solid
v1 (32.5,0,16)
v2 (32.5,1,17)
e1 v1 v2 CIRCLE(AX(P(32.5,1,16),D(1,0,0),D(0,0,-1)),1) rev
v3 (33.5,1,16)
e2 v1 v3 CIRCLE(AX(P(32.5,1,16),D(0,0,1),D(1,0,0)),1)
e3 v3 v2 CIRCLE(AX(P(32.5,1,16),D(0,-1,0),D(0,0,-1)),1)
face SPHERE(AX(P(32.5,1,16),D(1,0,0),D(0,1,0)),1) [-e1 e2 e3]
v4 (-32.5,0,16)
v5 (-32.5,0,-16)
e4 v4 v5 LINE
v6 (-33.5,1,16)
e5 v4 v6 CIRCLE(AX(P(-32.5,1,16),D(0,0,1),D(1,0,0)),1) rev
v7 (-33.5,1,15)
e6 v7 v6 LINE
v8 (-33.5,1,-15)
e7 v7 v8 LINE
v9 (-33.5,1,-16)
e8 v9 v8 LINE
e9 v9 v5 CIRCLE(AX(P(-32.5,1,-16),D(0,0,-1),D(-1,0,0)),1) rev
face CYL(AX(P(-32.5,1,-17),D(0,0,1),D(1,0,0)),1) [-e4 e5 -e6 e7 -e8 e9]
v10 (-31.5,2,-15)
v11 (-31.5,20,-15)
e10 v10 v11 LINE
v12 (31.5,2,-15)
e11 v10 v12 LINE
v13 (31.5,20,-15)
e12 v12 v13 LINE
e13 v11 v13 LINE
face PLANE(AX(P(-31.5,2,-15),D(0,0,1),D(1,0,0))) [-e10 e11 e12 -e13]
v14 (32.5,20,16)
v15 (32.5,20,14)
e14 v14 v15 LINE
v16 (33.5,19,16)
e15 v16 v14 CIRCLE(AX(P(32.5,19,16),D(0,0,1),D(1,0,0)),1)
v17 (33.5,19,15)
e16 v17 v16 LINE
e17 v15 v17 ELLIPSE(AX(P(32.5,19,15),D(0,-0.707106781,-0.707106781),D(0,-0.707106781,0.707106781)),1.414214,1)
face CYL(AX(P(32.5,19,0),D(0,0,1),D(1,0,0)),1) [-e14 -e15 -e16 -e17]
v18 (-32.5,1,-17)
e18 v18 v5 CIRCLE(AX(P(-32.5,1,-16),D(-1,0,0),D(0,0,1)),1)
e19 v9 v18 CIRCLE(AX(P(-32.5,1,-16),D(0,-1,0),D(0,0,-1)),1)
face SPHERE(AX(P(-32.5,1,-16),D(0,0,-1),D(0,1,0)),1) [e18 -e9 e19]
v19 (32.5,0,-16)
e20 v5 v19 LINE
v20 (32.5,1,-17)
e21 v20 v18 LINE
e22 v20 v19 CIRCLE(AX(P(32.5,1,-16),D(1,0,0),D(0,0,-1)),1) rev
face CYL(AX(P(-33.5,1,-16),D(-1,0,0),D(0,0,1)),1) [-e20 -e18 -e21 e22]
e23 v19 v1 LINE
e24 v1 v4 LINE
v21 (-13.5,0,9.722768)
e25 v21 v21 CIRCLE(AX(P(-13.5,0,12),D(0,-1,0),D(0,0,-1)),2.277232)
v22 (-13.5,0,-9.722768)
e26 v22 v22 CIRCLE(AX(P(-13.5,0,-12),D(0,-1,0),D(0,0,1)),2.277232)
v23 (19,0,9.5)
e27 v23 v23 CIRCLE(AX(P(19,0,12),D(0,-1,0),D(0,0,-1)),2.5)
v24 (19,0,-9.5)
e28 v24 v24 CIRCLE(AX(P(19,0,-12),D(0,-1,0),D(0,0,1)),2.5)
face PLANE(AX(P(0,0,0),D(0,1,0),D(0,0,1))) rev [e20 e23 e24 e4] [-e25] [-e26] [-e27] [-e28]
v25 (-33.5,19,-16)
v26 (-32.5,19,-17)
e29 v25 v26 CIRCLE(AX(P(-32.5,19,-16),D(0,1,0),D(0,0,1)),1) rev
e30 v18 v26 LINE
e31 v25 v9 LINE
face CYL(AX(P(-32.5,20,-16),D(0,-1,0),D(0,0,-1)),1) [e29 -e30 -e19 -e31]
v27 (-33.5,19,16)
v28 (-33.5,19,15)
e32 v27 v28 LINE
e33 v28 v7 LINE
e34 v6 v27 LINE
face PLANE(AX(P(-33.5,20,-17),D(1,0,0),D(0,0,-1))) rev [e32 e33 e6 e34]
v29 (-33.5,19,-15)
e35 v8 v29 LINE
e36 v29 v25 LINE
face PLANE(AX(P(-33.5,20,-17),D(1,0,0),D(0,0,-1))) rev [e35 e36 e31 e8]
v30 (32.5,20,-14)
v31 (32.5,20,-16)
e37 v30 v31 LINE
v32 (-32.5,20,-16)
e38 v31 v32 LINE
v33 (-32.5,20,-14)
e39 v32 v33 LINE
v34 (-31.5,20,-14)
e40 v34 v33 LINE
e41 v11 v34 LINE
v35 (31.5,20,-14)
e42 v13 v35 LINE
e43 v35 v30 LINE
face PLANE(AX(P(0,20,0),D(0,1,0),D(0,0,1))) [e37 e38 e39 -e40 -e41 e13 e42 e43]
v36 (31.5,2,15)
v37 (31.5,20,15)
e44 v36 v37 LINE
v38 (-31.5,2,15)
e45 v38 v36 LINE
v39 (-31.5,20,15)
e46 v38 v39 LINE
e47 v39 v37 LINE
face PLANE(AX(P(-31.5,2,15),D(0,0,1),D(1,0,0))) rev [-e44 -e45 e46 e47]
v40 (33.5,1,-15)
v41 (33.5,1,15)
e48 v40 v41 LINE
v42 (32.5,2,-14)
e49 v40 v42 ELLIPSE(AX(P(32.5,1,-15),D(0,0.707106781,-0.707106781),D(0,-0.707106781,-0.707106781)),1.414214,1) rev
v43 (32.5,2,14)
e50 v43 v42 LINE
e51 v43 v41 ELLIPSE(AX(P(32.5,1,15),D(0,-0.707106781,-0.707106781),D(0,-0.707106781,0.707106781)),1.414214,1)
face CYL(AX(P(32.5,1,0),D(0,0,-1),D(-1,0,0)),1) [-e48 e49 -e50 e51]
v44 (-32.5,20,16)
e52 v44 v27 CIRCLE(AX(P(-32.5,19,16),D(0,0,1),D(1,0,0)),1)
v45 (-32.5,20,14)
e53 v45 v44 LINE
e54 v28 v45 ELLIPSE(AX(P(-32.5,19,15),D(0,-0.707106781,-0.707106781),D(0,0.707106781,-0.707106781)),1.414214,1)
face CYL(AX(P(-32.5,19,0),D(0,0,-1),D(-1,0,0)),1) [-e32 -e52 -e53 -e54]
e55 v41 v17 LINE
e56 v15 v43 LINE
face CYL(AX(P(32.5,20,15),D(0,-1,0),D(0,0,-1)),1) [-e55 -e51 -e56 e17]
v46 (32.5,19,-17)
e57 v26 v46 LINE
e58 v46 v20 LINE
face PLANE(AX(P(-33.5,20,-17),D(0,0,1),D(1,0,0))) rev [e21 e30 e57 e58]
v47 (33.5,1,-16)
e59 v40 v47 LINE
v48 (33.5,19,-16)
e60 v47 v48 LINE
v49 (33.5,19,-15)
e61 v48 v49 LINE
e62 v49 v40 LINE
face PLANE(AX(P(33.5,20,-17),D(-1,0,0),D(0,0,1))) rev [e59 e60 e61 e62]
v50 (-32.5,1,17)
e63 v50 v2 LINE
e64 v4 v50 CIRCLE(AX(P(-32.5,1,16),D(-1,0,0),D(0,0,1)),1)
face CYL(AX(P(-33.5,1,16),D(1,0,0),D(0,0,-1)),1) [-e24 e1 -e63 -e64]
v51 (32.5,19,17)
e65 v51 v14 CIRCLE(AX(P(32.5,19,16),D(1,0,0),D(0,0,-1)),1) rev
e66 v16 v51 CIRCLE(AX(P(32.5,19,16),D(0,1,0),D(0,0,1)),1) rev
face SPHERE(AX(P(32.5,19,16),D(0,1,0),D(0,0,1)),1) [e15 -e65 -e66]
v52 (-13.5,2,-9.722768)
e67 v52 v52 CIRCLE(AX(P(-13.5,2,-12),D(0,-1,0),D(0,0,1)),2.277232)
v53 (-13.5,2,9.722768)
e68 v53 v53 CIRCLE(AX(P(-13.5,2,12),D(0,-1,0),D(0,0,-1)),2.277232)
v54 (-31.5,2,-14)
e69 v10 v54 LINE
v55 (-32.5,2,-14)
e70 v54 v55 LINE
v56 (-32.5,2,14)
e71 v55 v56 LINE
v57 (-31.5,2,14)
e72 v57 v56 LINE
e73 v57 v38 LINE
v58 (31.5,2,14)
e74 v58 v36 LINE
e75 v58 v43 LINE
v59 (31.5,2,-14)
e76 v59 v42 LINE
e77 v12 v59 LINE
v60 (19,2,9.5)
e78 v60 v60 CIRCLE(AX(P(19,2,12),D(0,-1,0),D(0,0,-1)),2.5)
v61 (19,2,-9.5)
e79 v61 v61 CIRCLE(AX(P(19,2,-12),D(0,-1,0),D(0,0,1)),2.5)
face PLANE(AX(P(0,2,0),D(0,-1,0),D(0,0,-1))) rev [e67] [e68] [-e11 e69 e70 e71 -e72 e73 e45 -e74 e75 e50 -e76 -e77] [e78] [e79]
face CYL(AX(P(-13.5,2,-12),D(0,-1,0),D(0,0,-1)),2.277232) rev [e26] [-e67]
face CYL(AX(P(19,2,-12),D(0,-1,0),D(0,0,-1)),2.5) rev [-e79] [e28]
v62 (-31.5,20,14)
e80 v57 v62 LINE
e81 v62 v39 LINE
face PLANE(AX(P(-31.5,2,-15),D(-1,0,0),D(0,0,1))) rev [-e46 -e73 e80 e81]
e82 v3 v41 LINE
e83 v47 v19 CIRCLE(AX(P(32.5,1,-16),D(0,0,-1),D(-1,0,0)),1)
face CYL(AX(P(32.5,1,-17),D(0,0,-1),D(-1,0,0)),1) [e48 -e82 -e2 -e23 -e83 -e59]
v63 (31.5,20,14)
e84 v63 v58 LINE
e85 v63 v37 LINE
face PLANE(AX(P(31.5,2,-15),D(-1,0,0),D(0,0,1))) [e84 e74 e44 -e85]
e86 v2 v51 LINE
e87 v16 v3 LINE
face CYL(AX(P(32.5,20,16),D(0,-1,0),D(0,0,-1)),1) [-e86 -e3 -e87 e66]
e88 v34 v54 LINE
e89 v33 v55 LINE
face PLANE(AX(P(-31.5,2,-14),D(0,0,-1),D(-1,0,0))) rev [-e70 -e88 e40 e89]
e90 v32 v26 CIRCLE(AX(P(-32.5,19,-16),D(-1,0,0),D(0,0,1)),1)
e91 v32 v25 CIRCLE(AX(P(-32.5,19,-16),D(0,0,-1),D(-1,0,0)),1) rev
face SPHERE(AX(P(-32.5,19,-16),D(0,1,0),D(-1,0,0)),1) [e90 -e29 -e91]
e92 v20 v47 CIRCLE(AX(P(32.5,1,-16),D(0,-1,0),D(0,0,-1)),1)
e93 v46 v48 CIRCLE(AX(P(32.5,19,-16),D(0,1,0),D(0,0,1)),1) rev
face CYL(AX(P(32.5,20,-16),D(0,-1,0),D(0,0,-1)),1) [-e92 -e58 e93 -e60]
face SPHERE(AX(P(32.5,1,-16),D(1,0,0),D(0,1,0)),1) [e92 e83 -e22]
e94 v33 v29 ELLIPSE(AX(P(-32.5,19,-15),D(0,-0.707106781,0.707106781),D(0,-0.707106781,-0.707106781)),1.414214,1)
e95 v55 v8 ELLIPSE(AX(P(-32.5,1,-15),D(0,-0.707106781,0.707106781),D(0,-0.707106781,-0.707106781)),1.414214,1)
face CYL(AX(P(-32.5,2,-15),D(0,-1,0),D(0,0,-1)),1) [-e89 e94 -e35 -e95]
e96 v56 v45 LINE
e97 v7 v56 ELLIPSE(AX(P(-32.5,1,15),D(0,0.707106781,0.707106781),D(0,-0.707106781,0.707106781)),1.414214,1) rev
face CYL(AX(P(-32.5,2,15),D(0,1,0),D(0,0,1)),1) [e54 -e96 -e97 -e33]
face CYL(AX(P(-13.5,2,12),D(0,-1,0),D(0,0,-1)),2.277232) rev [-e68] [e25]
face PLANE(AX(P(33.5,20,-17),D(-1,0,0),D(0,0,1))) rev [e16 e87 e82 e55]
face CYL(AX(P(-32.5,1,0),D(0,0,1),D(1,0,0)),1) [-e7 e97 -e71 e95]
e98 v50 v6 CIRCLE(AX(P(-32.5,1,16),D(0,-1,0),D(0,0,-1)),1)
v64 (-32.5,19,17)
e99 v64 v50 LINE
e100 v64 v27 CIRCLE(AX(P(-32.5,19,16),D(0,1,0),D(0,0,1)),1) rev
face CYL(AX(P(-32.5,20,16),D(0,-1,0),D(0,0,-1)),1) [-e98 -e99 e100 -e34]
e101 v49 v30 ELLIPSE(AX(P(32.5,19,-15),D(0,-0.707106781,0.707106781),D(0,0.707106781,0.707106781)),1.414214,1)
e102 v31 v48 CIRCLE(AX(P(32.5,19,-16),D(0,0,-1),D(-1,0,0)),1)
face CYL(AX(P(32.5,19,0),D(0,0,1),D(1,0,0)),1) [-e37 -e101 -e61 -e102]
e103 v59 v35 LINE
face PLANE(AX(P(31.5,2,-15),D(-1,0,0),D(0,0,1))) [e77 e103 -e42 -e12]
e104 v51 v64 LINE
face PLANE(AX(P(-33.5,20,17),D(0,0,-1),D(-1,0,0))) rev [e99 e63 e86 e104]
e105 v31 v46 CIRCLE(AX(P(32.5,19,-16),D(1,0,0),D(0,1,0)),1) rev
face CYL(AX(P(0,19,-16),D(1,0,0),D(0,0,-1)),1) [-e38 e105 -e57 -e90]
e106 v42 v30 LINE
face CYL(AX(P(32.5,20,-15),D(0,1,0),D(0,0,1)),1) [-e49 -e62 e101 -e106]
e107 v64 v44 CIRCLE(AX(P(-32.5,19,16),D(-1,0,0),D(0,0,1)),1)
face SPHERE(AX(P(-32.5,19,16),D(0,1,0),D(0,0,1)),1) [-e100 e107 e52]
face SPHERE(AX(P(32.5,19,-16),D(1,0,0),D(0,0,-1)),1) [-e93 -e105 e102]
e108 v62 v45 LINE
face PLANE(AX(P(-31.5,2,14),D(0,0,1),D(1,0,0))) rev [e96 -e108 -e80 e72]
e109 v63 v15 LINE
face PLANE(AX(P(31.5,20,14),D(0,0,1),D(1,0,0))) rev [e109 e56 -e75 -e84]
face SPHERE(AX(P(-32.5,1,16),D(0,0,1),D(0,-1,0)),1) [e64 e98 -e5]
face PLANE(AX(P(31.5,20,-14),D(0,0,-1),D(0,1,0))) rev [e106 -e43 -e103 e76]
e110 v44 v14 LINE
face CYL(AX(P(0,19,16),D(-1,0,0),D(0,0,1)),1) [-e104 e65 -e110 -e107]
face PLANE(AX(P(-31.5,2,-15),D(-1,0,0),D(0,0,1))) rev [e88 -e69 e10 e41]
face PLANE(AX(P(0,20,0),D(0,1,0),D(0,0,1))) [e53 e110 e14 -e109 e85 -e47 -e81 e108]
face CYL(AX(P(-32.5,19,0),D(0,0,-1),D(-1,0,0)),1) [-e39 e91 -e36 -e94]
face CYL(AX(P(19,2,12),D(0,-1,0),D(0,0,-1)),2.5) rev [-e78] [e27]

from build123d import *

# Parameters (mm, degrees)
SKETCH1_W           = 67
SKETCH1_H           = 34
BOSS_EXTRUDE1_DEPTH = 20
SKETCH4_W           = 63
SKETCH4_H           = 30
CUT_EXTRUDE1_DEPTH  = 18
SKETCH5_W           = 28
SKETCH5_H           = 18
CUT_EXTRUDE4_DEPTH  = 2
SKETCH8_W           = 28
SKETCH8_H           = 18
CUT_EXTRUDE5_DEPTH  = 2
SKETCH9_R           = 2.5
SKETCH9_R_2         = 2.277231992
CUT_EXTRUDE6_DEPTH  = 2
FILLET1_R           = 1


with BuildPart() as part:
    # Sketch1 → Boss-Extrude1 (new body)
    with BuildSketch(Plane(origin=(0, 0, 0), x_dir=(1, 0, 0), z_dir=(0, 1, 0))):
        Rectangle(SKETCH1_W, SKETCH1_H)
    extrude(amount=BOSS_EXTRUDE1_DEPTH)

    # Sketch4 → Cut-Extrude1 (cut)
    with BuildSketch(Plane(origin=(0, 20, 0), x_dir=(1, 0, 0), z_dir=(0, 1, 0))):
        Rectangle(SKETCH4_W, SKETCH4_H)
    extrude(amount=-CUT_EXTRUDE1_DEPTH, mode=Mode.SUBTRACT)

    # Sketch5 → Cut-Extrude4 (cut)
    with BuildSketch(Plane(origin=(33.5, 0, 0), x_dir=(0, 0, -1), z_dir=(1, 0, 0))):
        with Locations((0, 11)):
            Rectangle(SKETCH5_W, SKETCH5_H)
    extrude(amount=-CUT_EXTRUDE4_DEPTH, mode=Mode.SUBTRACT)

    # Sketch8 → Cut-Extrude5 (cut)
    with BuildSketch(Plane.ZY.offset(33.5)):
        with Locations((0, 11)):
            Rectangle(SKETCH8_W, SKETCH8_H)
    extrude(amount=-CUT_EXTRUDE5_DEPTH, mode=Mode.SUBTRACT)

    # Sketch9 → Cut-Extrude6 (cut)
    with BuildSketch(Plane.XZ):
        with Locations(Location((19, 12, 0), (0, 0, 270))):
            Circle(SKETCH9_R)
        with Locations(Location((19, -12, 0), (0, 0, 90))):
            Circle(SKETCH9_R)
        with Locations(Location((-13.5, 12, 0), (0, 0, 270))):
            Circle(SKETCH9_R_2)
        with Locations(Location((-13.5, -12, 0), (0, 0, 90))):
            Circle(SKETCH9_R_2)
    extrude(amount=-CUT_EXTRUDE6_DEPTH, mode=Mode.SUBTRACT)

    # Fillet1
    fillet1_edges = [part.edges().sort_by_distance(p)[0] for p in [
        (-33.5, 20, -15.5),
        (0, 20, 17),
        (33.5, 20, -15.5),
        (33.5, 11, -14),
        (33.5, 11, 14),
        (33.5, 2, 0),
        (-33.5, 20, 15.5),
        (-33.5, 11, 14),
        (-33.5, 11, -14),
        (-33.5, 2, 0),
        (33.5, 20, 15.5),
        (0, 0, 17),
        (-33.5, 0, 0),
        (0, 0, -17),
        (33.5, 0, 0),
        (33.5, 10, 17),
        (-33.5, 10, 17),
        (-33.5, 10, -17),
        (33.5, 10, -17),
        (0, 20, -17),
    ]]
    fillet(fillet1_edges, radius=FILLET1_R - 0.0001)  # a hair under: the kernel refuses the full size


solid = part.part
